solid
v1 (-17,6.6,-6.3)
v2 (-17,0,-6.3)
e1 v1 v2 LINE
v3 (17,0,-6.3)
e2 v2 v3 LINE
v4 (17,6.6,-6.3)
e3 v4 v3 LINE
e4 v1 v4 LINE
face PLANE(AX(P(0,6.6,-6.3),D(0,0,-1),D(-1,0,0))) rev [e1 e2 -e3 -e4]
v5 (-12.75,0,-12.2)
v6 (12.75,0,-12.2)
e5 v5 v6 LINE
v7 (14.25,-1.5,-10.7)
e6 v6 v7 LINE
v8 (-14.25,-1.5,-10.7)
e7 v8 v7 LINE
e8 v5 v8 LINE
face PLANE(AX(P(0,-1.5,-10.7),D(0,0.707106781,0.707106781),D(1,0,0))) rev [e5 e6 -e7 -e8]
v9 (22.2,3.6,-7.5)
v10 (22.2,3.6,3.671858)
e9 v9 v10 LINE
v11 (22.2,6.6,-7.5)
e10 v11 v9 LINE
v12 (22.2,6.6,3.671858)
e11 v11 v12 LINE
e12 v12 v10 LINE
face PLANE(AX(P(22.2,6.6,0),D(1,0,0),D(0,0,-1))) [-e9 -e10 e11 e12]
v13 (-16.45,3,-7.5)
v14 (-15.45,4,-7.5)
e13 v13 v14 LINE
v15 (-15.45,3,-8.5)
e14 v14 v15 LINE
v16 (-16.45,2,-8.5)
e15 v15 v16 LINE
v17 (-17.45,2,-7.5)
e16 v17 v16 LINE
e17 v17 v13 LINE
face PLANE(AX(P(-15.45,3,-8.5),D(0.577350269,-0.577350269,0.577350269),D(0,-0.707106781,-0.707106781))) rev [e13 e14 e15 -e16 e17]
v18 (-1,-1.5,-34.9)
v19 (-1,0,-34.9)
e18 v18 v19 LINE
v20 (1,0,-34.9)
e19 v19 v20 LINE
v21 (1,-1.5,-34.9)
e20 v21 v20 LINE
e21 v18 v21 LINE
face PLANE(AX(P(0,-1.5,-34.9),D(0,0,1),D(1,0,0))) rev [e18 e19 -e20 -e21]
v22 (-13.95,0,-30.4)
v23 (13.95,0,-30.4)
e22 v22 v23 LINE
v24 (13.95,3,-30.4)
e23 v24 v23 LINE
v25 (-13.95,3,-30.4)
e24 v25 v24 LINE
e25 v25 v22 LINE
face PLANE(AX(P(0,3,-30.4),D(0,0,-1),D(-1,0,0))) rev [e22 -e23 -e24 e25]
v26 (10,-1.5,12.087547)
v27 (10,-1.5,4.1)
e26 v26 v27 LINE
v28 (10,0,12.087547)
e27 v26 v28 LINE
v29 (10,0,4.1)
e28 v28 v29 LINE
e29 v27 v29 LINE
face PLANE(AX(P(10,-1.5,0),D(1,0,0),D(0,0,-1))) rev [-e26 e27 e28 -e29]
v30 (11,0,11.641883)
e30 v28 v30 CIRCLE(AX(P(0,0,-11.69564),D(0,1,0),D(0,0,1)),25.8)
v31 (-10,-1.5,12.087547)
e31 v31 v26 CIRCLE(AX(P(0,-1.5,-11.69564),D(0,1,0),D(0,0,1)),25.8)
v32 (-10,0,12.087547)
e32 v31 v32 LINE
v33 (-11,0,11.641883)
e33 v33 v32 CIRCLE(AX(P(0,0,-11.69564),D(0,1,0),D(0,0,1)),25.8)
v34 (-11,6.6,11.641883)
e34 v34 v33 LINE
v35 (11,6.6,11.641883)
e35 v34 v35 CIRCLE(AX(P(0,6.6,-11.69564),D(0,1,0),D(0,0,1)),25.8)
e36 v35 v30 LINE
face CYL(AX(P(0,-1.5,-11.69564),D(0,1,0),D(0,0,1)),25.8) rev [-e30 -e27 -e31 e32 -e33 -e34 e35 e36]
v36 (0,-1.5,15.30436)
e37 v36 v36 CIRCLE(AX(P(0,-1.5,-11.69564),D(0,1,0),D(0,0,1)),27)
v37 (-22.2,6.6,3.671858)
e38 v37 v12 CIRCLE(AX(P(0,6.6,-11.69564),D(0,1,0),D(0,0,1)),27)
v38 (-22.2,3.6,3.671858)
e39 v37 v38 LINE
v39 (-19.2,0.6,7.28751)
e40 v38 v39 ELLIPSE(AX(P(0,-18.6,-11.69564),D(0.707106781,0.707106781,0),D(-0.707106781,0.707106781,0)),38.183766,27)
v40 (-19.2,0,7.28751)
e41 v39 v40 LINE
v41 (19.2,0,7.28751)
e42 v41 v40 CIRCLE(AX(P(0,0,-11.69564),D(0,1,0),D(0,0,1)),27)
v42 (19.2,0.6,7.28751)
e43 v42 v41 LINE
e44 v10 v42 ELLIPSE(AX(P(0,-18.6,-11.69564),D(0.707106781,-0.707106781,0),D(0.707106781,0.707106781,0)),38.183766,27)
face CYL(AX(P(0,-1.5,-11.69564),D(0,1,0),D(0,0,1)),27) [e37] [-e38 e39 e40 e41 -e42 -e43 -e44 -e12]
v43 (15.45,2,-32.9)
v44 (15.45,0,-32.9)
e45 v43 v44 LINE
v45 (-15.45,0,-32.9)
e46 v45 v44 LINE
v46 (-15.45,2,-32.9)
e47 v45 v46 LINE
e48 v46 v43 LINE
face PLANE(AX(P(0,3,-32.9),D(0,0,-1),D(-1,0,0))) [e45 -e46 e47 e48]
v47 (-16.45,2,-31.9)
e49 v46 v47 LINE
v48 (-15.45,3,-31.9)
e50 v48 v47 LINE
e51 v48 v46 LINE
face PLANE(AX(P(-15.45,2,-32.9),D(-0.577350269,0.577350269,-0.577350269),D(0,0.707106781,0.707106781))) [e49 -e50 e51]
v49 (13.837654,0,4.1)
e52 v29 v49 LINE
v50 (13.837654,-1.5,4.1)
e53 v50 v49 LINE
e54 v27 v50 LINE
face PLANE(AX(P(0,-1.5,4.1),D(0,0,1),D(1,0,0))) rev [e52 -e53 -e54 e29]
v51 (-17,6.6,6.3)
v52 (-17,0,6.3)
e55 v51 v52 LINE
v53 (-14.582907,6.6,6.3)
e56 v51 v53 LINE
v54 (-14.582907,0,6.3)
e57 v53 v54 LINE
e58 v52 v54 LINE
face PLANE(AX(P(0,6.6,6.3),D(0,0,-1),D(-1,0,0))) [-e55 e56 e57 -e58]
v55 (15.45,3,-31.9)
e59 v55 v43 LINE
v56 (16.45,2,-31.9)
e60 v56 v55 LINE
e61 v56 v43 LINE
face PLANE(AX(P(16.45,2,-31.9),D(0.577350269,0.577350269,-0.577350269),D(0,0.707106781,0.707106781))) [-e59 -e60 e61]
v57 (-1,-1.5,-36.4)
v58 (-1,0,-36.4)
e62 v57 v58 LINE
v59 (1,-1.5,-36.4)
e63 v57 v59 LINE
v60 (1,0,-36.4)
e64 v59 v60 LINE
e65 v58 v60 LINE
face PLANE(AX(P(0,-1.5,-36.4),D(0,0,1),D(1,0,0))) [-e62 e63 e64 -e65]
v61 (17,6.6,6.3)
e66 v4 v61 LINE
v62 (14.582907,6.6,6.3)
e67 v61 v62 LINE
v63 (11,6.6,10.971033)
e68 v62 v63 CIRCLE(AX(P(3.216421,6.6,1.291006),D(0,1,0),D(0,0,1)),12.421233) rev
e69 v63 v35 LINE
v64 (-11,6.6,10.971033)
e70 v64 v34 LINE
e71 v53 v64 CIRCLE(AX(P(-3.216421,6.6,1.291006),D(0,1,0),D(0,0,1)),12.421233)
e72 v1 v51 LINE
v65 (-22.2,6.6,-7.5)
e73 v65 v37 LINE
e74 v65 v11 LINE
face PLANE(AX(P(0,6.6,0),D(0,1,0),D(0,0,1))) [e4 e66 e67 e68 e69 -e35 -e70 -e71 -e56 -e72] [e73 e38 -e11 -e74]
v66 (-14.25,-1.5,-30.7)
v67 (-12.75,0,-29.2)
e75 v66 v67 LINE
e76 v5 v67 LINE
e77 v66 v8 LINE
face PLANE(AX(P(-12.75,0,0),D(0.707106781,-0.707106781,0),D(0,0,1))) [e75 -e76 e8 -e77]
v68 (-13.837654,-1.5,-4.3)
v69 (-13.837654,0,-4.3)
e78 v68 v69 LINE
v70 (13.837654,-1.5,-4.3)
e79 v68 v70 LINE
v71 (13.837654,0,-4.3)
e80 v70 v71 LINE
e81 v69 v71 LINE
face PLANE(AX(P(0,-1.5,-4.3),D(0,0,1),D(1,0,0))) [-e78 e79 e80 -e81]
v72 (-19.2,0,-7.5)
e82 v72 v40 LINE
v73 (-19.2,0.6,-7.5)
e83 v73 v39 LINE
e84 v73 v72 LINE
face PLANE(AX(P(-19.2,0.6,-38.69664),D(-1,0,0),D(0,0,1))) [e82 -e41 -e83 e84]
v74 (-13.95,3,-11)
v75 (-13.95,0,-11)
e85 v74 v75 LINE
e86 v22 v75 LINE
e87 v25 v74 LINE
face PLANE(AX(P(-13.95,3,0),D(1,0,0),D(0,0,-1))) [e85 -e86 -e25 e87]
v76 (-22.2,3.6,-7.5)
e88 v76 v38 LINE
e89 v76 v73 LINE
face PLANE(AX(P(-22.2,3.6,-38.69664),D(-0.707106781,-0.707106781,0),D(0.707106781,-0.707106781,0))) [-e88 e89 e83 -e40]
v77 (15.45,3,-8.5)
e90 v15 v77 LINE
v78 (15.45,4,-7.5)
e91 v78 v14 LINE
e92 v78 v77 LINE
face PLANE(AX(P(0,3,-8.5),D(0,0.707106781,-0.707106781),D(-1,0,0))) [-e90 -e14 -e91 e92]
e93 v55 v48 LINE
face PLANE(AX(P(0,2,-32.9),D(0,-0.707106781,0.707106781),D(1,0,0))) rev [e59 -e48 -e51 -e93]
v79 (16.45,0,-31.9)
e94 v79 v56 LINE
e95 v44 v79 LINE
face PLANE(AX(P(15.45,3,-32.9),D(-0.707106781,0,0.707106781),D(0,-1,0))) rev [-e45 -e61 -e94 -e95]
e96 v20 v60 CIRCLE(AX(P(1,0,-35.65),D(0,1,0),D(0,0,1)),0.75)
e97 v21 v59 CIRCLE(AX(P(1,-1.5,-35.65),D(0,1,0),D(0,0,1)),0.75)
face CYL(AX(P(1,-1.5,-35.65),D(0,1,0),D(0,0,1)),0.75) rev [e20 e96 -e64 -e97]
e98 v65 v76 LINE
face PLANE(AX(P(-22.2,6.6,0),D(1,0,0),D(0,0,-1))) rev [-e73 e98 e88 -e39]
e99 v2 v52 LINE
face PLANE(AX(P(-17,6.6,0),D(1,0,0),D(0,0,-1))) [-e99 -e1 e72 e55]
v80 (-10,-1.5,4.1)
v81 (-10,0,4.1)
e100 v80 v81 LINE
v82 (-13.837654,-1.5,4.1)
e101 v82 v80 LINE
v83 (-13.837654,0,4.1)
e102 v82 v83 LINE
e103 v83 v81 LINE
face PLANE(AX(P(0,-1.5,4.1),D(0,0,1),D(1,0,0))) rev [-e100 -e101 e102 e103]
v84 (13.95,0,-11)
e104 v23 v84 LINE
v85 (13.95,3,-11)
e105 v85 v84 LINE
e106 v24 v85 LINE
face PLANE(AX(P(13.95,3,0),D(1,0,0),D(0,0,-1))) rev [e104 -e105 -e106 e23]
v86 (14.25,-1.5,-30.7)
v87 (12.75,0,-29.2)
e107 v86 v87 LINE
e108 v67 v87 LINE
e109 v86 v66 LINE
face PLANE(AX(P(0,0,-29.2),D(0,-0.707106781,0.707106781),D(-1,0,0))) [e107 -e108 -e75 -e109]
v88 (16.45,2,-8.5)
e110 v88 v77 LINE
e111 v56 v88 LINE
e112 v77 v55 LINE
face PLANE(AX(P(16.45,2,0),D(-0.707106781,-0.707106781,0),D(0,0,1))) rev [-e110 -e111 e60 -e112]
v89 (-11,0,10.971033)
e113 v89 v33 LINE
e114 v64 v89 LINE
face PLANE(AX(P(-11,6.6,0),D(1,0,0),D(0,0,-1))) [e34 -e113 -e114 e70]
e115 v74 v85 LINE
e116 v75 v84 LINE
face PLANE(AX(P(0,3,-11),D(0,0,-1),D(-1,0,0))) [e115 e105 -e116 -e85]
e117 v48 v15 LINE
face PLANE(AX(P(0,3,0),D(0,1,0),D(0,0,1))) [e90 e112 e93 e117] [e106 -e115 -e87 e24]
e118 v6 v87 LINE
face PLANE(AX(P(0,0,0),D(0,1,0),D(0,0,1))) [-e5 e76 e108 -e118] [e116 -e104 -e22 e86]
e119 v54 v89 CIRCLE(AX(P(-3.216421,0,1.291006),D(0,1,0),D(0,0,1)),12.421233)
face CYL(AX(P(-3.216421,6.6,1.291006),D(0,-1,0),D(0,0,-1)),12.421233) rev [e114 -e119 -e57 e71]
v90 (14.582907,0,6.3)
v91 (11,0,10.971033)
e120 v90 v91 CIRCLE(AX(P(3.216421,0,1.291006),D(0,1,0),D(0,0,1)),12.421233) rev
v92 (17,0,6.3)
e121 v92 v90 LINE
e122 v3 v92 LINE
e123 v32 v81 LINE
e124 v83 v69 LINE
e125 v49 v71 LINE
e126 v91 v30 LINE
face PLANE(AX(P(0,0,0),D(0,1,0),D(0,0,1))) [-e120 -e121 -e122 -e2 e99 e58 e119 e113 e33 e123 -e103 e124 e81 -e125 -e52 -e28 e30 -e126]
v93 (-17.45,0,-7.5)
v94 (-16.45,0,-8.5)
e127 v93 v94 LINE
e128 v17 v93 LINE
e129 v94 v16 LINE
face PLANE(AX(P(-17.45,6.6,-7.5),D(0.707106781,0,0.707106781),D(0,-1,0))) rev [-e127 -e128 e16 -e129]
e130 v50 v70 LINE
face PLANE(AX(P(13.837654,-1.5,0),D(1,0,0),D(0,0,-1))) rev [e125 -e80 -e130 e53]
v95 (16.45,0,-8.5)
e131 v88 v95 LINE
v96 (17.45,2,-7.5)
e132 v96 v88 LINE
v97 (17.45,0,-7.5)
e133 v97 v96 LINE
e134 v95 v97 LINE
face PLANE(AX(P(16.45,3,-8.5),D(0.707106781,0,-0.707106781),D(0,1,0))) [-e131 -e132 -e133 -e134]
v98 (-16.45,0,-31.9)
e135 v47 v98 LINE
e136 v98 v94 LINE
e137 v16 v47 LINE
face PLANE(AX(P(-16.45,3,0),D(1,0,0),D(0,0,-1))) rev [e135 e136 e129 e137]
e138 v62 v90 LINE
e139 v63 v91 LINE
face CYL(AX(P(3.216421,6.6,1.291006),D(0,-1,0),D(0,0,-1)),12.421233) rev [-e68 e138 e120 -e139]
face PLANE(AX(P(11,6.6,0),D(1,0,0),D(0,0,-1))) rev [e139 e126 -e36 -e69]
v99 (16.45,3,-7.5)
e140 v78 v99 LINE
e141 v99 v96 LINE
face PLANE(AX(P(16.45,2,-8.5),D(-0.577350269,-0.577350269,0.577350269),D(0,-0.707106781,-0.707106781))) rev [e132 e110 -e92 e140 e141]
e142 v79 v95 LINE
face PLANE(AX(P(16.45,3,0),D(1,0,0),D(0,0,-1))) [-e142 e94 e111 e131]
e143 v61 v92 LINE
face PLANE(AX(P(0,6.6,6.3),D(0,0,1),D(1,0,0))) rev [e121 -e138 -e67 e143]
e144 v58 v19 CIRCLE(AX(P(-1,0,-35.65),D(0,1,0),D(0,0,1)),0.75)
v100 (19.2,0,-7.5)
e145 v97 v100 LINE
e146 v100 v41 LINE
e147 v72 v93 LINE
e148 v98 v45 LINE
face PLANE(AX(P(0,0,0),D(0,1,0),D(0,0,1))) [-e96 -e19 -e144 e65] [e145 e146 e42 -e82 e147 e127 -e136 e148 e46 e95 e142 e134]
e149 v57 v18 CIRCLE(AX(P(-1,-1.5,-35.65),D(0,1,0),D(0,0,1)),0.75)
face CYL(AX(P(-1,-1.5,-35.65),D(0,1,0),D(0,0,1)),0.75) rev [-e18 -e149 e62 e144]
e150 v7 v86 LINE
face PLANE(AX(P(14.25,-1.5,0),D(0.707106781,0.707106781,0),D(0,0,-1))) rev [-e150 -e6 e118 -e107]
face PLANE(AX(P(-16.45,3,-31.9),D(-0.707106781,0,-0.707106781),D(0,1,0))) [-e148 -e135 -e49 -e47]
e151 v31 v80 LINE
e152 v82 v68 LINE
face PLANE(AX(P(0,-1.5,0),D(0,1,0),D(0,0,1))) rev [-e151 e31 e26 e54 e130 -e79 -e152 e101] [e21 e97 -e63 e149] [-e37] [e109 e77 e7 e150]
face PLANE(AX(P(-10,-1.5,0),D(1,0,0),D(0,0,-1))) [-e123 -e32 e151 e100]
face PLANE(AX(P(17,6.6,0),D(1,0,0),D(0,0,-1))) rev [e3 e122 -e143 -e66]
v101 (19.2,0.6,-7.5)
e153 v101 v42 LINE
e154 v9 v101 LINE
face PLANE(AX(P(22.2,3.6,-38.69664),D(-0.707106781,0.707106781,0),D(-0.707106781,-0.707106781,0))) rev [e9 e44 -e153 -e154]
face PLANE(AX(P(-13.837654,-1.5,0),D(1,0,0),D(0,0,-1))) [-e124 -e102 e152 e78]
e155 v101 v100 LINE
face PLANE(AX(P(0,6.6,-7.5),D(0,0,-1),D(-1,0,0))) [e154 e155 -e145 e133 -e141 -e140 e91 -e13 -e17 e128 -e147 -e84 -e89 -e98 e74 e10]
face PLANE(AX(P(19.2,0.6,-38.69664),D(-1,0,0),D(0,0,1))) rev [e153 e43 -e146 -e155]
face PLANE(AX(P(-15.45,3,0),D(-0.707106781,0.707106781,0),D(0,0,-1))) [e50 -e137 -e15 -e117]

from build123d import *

# Parameters (mm, degrees)
SKETCH1_R                      = 27
SKETCH1_W                      = 25.5
SKETCH1_H                      = 17
BOSS_EXTRUDE1_DEPTH            = 1.5
BOSS_EXTRUDE2_START            = 6.6
BOSS_EXTRUDE2_DEPTH            = 6.6
CUT_EXTRUDE1_REACH             = 44.685
CUT_EXTRUDE1_END_RADIUS        = 27
CUT_EXTRUDE1_DIRECTION_2_DEPTH = 1.2
SKETCH1_5_W                    = 32.9
SKETCH1_5_H                    = 25.4
SKETCH1_5_W_2                  = 27.9
SKETCH1_5_H_2                  = 19.4
BOSS_EXTRUDE3_DEPTH            = 3
CHAMFER1_SIZE                  = 1.5
CHAMFER2_SIZE                  = 1


with BuildPart() as part:
    # Sketch1 → Boss-Extrude1 (new body)
    with BuildSketch(Plane(origin=(0, 0, 0), x_dir=(1, 0, 0), z_dir=(0, 1, 0))):
        with Locations(Location((0, 11.695639977, 0), (0, 0, 270))):
            Circle(SKETCH1_R)
        with BuildLine():
            Line((10, -4.1), (10, -12.087547362))
            ThreePointArc((10, -12.087547362), (0, -14.104360023), (-10, -12.087547362))
            Line((-10, -12.087547362), (-10, -4.1))
            Line((-10, -4.1), (-13.837653888, -4.1))
            Line((-13.837653888, -4.1), (-13.837653888, 4.3))
            Line((-13.837653888, 4.3), (13.837653888, 4.3))
            Line((13.837653888, 4.3), (13.837653888, -4.1))
            Line((13.837653888, -4.1), (10, -4.1))
        make_face(mode=Mode.SUBTRACT)
        with BuildLine():
            ThreePointArc((-1, 34.9), (-1.75, 35.65), (-1, 36.4))
            Line((-1, 36.4), (1, 36.4))
            ThreePointArc((1, 36.4), (1.75, 35.65), (1, 34.9))
            Line((1, 34.9), (-1, 34.9))
        make_face(mode=Mode.SUBTRACT)
        with Locations((0, 20.7)):
            Rectangle(SKETCH1_W, SKETCH1_H, mode=Mode.SUBTRACT)
    extrude(amount=-BOSS_EXTRUDE1_DEPTH)

    # Sketch1<3> → Boss-Extrude2 (add)
    with BuildSketch(Plane(origin=(0, 0, 0), x_dir=(1, 0, 0), z_dir=(0, 1, 0)).offset(BOSS_EXTRUDE2_START)):
        with BuildLine():
            Line((-16.45, 7.5), (-22.2, 7.5))
            Line((-22.2, 7.5), (-22.2, -3.671858193))
            ThreePointArc((-22.2, -3.671858193), (0, -15.304360023), (22.2, -3.671858193))
            Line((22.2, -3.671858193), (22.2, 7.5))
            Line((22.2, 7.5), (16.45, 7.5))
            Line((16.45, 7.5), (-16.45, 7.5))
        make_face()
        with BuildLine():
            Line((-17, -6.3), (-17, 6.3))
            Line((-17, 6.3), (17, 6.3))
            Line((17, 6.3), (17, -6.3))
            Line((17, -6.3), (14.582906959, -6.3))
            ThreePointArc((14.582906959, -6.3), (13.072174848, -8.850843183), (11, -10.971032764))
            Line((11, -10.971032764), (11, -11.641883456))
            ThreePointArc((11, -11.641883456), (10.502364214, -11.870020335), (10, -12.087547362))
            ThreePointArc((10, -12.087547362), (0, -14.104360023), (-10, -12.087547362))
            ThreePointArc((-10, -12.087547362), (-10.502364214, -11.870020335), (-11, -11.641883456))
            Line((-11, -11.641883456), (-11, -10.971032764))
            ThreePointArc((-11, -10.971032764), (-13.072174848, -8.850843183), (-14.582906959, -6.3))
            Line((-14.582906959, -6.3), (-17, -6.3))
        make_face(mode=Mode.SUBTRACT)
    extrude(amount=-BOSS_EXTRUDE2_DEPTH)

    # Cut-Extrude1: up to this cylinder (the profile starts inside it)
    cut_extrude1_end = Plane(origin=(0, 1.228571, -11.695639977), z_dir=(0, 1, 0)) * Cylinder(CUT_EXTRUDE1_END_RADIUS, 144.37, mode=Mode.PRIVATE)
    # Sketch2 → Cut-Extrude1 (cut, up to the surface)
    with BuildSketch(Plane.XY.offset(-6.3), mode=Mode.PRIVATE) as cut_extrude1_sk1:
        Polygon((-22.2, 3.6), (-19.2, 0.6), (-19.2, 0), (-22.2, 0), align=None)
    cut_extrude1_tool1 = extrude(cut_extrude1_sk1.sketch, amount=CUT_EXTRUDE1_REACH, mode=Mode.PRIVATE) & cut_extrude1_end
    add(cut_extrude1_tool1.solids().sort_by_distance((-21.057143, 1.228571, -6.3))[0], mode=Mode.SUBTRACT)
    # Sketch2 → Cut-Extrude1 (cut, up to the surface)
    with BuildSketch(Plane.XY.offset(-6.3), mode=Mode.PRIVATE) as cut_extrude1_sk2:
        Polygon((19.2, 0.6), (19.2, 0), (22.2, 0), (22.2, 3.6), align=None)
    cut_extrude1_tool2 = extrude(cut_extrude1_sk2.sketch, amount=CUT_EXTRUDE1_REACH, mode=Mode.PRIVATE) & cut_extrude1_end
    add(cut_extrude1_tool2.solids().sort_by_distance((21.057143, 1.228571, -6.3))[0], mode=Mode.SUBTRACT)

    # Sketch2 → Cut-Extrude1 direction 2 (cut)
    with BuildSketch(Plane.XY.offset(-6.3)):
        Polygon((-22.2, 3.6), (-19.2, 0.6), (-19.2, 0), (-22.2, 0), align=None)
        Polygon((19.2, 0.6), (19.2, 0), (22.2, 0), (22.2, 3.6), align=None)
    extrude(amount=-CUT_EXTRUDE1_DIRECTION_2_DEPTH, mode=Mode.SUBTRACT)

    # Sketch1<5> → Boss-Extrude3 (add)
    with BuildSketch(Plane(origin=(0, 0, 0), x_dir=(1, 0, 0), z_dir=(0, 1, 0))):
        with Locations((0, 20.2)):
            Rectangle(SKETCH1_5_W, SKETCH1_5_H)
        with Locations((0, 20.7)):
            Rectangle(SKETCH1_5_W_2, SKETCH1_5_H_2, mode=Mode.SUBTRACT)
    extrude(amount=BOSS_EXTRUDE3_DEPTH)

    # Chamfer1
    chamfer1_edges = [part.edges().sort_by_distance(p)[0] for p in [
        (-12.75, -1.5, -20.7),
        (0, -1.5, -12.2),
        (0, -1.5, -29.2),
        (12.75, -1.5, -20.7),
    ]]
    chamfer(chamfer1_edges, length=CHAMFER1_SIZE - 0.0001)  # a hair under: the kernel refuses the full size

    # Chamfer2
    chamfer2_edges = [part.edges().sort_by_distance(p)[0] for p in [
        (16.45, 3, -20.2),
        (16.45, 1.5, -7.5),
        (0, 3, -32.9),
        (16.45, 1.5, -32.9),
        (-16.45, 1.5, -32.9),
        (-16.45, 1.5, -7.5),
        (-16.45, 3, -20.2),
        (0, 3, -7.5),
    ]]
    chamfer(chamfer2_edges, length=CHAMFER2_SIZE)


solid = part.part
